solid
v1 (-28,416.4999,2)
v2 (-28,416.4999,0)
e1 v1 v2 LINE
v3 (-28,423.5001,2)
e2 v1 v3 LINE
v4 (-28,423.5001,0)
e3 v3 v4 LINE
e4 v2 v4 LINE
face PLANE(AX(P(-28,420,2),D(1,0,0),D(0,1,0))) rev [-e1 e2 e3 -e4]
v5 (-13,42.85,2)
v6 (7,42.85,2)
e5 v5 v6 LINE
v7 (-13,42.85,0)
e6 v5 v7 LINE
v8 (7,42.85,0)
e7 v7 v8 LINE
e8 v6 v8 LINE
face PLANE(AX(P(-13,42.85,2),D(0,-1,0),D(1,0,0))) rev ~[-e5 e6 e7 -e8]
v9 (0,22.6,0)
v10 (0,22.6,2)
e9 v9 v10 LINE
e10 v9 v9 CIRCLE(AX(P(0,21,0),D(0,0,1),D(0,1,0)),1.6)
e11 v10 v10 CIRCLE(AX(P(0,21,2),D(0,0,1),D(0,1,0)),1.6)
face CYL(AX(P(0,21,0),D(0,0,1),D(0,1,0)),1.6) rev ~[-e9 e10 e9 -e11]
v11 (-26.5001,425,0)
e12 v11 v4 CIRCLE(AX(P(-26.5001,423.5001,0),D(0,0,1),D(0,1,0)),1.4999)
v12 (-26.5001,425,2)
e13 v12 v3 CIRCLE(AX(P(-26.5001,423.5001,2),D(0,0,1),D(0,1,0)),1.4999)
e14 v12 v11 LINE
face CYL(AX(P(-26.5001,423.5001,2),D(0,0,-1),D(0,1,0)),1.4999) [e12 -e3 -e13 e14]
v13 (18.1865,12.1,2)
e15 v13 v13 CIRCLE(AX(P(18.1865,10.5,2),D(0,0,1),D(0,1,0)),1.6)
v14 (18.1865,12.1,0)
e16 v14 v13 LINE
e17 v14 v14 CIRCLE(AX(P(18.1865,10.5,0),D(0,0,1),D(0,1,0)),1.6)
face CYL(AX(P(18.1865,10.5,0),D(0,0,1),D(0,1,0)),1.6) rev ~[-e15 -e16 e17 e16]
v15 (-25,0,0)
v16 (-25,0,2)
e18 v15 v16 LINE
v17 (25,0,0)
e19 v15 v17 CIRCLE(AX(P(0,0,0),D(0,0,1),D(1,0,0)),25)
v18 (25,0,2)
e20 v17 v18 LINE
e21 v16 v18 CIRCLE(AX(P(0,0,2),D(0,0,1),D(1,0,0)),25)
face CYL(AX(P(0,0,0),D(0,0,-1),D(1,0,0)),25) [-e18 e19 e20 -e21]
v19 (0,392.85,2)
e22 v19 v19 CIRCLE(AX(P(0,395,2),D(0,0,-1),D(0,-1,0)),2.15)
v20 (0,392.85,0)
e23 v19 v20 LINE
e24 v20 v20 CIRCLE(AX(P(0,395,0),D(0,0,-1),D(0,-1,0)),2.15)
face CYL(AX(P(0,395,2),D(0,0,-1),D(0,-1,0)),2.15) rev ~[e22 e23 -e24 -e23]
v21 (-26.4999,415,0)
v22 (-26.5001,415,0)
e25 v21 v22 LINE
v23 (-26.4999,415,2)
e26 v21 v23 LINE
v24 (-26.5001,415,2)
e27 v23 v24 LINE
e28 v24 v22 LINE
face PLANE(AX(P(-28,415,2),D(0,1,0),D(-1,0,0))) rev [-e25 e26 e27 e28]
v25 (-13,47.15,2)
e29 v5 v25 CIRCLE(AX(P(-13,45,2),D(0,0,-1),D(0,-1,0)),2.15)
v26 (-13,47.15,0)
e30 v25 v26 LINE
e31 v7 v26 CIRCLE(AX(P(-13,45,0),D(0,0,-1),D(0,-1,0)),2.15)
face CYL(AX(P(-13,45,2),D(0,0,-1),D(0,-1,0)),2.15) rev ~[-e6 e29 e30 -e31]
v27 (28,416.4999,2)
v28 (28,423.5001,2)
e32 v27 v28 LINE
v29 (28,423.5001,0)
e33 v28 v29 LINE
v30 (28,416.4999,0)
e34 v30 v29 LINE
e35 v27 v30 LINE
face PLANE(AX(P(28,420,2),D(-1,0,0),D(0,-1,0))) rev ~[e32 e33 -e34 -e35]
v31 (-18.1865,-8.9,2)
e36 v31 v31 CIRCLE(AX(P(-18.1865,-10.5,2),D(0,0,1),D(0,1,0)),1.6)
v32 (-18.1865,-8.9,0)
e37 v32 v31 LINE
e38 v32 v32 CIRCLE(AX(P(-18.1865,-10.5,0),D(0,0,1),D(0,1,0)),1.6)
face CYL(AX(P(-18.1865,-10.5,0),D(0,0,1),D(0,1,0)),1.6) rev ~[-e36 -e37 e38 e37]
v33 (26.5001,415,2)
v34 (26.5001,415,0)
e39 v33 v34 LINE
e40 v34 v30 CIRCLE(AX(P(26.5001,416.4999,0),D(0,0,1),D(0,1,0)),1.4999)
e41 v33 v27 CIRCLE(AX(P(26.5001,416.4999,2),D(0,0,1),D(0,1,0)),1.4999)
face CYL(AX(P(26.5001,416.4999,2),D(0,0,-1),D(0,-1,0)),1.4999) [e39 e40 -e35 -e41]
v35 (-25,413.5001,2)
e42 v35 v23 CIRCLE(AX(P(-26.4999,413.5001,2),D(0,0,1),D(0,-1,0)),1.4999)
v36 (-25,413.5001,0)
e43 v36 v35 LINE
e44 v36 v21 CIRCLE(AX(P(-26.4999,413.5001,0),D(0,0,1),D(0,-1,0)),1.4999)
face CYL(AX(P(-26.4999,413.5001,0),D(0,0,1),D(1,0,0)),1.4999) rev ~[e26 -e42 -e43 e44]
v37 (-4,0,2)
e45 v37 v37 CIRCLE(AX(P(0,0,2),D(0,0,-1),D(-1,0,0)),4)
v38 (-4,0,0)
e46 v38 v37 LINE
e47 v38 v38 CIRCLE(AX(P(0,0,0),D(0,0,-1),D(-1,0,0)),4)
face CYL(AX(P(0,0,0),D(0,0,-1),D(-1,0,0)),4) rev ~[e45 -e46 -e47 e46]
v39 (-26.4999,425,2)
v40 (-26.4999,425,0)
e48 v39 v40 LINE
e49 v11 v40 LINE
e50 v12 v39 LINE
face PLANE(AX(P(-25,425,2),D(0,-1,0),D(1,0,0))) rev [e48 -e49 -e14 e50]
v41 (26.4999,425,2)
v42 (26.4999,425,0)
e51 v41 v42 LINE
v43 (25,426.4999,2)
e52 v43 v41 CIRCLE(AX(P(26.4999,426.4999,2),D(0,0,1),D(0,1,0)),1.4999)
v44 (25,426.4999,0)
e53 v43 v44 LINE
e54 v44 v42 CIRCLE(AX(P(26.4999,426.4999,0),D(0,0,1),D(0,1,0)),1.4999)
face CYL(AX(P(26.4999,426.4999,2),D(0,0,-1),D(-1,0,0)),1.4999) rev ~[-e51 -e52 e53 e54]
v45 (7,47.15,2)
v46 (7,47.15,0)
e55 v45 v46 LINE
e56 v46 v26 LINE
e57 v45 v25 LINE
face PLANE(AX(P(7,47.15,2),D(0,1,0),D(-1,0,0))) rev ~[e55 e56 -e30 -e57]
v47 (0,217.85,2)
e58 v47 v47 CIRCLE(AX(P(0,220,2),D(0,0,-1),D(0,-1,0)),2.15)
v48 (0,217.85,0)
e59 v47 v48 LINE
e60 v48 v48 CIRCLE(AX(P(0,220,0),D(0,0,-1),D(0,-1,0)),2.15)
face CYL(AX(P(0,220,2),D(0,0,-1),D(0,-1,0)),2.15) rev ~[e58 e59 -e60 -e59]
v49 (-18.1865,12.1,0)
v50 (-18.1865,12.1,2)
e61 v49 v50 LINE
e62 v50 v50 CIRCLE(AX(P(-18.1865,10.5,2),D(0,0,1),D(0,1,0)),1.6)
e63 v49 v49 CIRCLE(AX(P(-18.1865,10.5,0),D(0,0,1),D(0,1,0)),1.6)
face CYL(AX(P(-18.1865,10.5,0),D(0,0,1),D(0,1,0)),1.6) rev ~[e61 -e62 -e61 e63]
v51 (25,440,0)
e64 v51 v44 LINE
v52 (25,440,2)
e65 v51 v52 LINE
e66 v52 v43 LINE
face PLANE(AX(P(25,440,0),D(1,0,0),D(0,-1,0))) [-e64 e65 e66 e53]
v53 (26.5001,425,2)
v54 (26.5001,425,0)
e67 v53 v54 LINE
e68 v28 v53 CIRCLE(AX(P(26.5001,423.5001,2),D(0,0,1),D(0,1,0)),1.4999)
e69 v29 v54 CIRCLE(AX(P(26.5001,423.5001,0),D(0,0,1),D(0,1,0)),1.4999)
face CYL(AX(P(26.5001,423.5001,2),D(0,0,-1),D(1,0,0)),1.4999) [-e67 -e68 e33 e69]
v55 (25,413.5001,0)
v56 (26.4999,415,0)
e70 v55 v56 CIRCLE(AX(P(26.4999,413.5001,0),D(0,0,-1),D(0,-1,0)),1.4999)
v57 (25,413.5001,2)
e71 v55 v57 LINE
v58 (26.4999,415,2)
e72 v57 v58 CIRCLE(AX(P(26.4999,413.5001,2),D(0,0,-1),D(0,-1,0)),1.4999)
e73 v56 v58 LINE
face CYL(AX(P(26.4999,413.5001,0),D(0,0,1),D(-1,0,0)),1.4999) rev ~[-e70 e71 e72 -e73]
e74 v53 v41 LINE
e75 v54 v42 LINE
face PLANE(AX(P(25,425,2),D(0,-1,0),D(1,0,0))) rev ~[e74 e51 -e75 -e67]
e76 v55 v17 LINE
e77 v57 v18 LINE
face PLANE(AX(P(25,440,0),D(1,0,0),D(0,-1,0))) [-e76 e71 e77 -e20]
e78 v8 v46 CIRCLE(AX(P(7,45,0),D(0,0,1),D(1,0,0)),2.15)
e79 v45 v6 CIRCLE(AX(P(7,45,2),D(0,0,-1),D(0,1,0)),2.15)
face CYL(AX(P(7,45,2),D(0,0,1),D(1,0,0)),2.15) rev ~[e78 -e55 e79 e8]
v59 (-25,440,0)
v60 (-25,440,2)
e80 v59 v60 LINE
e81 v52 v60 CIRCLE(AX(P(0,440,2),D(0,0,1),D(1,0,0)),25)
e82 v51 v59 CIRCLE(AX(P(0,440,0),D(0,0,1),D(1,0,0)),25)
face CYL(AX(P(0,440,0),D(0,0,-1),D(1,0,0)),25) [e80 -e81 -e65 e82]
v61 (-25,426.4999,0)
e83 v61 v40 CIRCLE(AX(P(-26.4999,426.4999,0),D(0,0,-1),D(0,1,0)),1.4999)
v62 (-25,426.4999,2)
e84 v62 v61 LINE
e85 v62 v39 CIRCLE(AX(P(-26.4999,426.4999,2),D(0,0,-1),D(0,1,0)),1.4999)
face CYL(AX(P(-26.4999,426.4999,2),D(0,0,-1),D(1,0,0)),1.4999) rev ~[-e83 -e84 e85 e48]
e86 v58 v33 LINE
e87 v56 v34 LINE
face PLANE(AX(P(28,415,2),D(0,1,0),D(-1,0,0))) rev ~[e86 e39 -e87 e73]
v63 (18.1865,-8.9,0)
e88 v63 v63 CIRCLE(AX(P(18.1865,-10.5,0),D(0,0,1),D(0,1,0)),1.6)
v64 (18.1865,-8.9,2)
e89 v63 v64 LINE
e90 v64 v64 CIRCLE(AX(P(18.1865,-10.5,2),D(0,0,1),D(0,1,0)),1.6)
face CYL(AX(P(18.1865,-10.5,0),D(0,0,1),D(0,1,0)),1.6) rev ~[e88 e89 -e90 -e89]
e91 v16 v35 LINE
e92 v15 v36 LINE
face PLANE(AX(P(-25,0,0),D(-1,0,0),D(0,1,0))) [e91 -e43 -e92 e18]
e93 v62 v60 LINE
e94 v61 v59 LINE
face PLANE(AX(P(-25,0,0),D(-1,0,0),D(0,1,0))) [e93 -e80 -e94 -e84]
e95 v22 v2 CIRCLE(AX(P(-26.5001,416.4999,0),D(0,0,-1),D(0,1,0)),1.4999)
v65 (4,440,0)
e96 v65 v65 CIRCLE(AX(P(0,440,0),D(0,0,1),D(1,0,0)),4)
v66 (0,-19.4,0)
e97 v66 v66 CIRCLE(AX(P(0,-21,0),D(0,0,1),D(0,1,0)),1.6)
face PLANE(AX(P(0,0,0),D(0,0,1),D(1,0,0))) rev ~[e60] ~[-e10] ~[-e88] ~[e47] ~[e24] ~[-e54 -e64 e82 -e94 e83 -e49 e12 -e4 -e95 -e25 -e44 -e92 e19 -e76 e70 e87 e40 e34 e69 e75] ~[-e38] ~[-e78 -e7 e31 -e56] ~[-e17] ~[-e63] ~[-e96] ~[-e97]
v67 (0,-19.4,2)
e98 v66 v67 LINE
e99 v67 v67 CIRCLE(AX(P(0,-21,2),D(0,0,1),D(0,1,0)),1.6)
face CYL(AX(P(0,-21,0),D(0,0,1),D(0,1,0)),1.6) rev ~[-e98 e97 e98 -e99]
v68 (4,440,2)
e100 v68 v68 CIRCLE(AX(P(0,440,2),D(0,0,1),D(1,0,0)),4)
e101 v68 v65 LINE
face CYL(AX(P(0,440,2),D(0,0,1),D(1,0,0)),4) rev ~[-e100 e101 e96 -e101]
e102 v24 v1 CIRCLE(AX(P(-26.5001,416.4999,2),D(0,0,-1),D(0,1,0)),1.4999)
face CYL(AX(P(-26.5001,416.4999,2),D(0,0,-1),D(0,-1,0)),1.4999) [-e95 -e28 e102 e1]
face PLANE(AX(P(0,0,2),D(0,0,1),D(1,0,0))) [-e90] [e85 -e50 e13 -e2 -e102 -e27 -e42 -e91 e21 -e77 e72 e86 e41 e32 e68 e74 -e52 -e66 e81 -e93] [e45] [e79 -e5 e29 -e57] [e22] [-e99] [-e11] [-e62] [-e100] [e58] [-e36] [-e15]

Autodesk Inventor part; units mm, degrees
ref_plane "YZ Plane" through (0, 0, 0) normal (1, 0, 0) x (0, 1, 0)
ref_plane "XZ Plane" through (0, 0, 0) normal (0, 1, 0) x (-1, 0, 0)
ref_plane "XY Plane" through (0, 0, 0) normal (0, 0, 1) x (1, 0, 0)
sketch "スケッチ1" plane through (0, 0, 0) normal (0, 0, 1) x (1, 0, 0)
  circle A0 centre (0, 0) radius 25
  circle A1 centre (0, 440) radius 25
  line L0 (-25, 0) -> (-25, 440)
  line L1 (25, 440) -> (25, 0)
  dimension "d0" = 50
  dimension "d1" = 50
  dimension "d2" = 440
extrude "プレート1" add sketch "スケッチ1" along normal blind 2
sketch "スケッチ4" plane through (0, 0, 0) normal (0, 0, -1) x (-1, 0, 0)
  circle A0 centre (0, 0) radius 4
  dimension "d28" = 8
extrude "押し出し1" cut sketch "スケッチ4" against normal blind 10
sketch "スケッチ5" plane through (0, 0, 0) normal (0, 0, -1) x (-1, 0, 0)
  circle A0 centre (0, 0) radius 21
  point P0 (0, 21)
  point P1 (-18.1865, 10.5)
  point P2 (-18.1865, -10.5)
  point P3 (0, -21)
  point P4 (18.1865, -10.5)
  point P5 (18.1865, 10.5)
  dimension "d31" = 42
  dimension "d34" = 360
hole "穴3" at (0, 21, 0) at (18.1865, 10.5, 0) at (18.1865, -10.5, 0) at (0, -21, 0) at (-18.1865, -10.5, 0) at (-18.1865, 10.5, 0) direction (0, 0, 1) diameter 3.2 end through all clearance for "Flat Head Machine Screw" size "M3" standard "Ansi Metric M Profile"
sketch "スケッチ6" plane through (0, 0, 2) normal (0, 0, 1) x (1, 0, 0)
  arc A0 (25, 440) -> (-25, 440) centre (0, 440) ccw projected
  circle A1 centre (0, 440) radius 4
  point P0 (0, 0)
  dimension "d43" = 8
extrude "押し出し2" cut sketch "スケッチ6" against normal blind 10
sketch "スケッチ8" plane through (0, 0, 2) normal (0, 0, 1) x (1, 0, 0)
  arc A0 (25, 440) -> (-25, 440) centre (0, 440) ccw projected
  point P0 (0, 0)
  point P1 (-13, 45)
  point P2 (0, 395)
  point P3 (0, 220)
  dimension "d54" = 45
  dimension "d55" = 220
  dimension "d71" = 45
  dimension "d72" = 13
hole "穴4" at (-13, 45, 2) at (0, 395, 2) at (0, 220, 2) direction (0, 0, -1) diameter 4.3 end through all clearance for "Flat Head Machine Screw" size "M4" standard "Ansi Metric M Profile"
sketch "スケッチ10" plane through (0, 0, 2) normal (0, 0, 1) x (1, 0, 0)
  circle A0 centre (7, 45) radius 2.15
  line L0 (7, 45) -> (-13, 45) construction
  line L1 (7, 47.15) -> (-13, 47.15)
  line L2 (-13, 42.85) -> (7, 42.85)
  arc A1 (7, 42.85) -> (7, 47.15) centre (7, 45) ccw
  arc A2 (-13, 47.15) -> (-13, 42.85) centre (-13, 45) ccw
  circle A3 centre (-13, 45) radius 2.15 projected
  point P0 (0, 0)
  point P1 (-3, 45)
  point P2 (7, 47.15)
  point P3 (7, 42.85)
  dimension "d68" = 20
extrude "押し出し3" cut sketch "スケッチ10" against normal blind 10
sketch "スケッチ11" plane through (0, 0, 2) normal (0, 0, 1) x (1, 0, 0)
  circle A0 centre (25, 420) radius 3
  line L0 (25, 440) -> (25, 0) projected
  circle A1 centre (0, 440) radius 4 projected
  line L1 (22, 425) -> (28, 425)
  line L2 (28, 425) -> (28, 415)
  line L3 (28, 415) -> (22, 415)
  line L4 (22, 415) -> (22, 425)
  line L5 (22, 425) -> (28, 415) construction
  line L6 (28, 425) -> (22, 415) construction
  point P0 (0, 0)
  point P1 (25, 423)
  point P2 (25, 417)
  point P3 (28, 420)
  dimension "d73" = 6
  dimension "d74" = 0
  dimension "d75" = 20
  dimension "d79" = 10
extrude "押し出し4" add sketch "スケッチ11" against normal up to surface (2 mm away) contours A0 L0 | L2 L3 L0 A0 | A0 L0 L1 L2 | L0 A0 | A0 L4 L1 L0 | L0 L3 L4 A0
fillet "コーナーR1" radius 1.5 4 edges at (25, 425, 1) (28, 425, 1) (28, 415, 1) (25, 415, 1)
mirror "ミラー1" about plane through (0, 0, 0) normal (1, 0, 0) of "押し出し4", "コーナーR1"
fillet_without_effect "コーナーR2"
equation "\"d41\" = Thickness"
equation "\"d3\" = Thickness"
equation "\"BendRadius\" = Thickness"
equation "\"BendReliefWidth\" = Thickness"
equation "\"BendReliefDepth\" = 0.5 * Thickness"
equation "\"CornerReliefSize\" = 4 * Thickness"
equation "\"MinimumRemnant\" = 2 * Thickness"
equation "\"TransitionRadius\" = BendRadius"
equation "\"JacobiRadiusSize\" = Thickness"
equation "\"GapSize\" = Thickness"
equation "\"Thickness\" = 2"
properties part number "link3-plate1" material "CFRP"
